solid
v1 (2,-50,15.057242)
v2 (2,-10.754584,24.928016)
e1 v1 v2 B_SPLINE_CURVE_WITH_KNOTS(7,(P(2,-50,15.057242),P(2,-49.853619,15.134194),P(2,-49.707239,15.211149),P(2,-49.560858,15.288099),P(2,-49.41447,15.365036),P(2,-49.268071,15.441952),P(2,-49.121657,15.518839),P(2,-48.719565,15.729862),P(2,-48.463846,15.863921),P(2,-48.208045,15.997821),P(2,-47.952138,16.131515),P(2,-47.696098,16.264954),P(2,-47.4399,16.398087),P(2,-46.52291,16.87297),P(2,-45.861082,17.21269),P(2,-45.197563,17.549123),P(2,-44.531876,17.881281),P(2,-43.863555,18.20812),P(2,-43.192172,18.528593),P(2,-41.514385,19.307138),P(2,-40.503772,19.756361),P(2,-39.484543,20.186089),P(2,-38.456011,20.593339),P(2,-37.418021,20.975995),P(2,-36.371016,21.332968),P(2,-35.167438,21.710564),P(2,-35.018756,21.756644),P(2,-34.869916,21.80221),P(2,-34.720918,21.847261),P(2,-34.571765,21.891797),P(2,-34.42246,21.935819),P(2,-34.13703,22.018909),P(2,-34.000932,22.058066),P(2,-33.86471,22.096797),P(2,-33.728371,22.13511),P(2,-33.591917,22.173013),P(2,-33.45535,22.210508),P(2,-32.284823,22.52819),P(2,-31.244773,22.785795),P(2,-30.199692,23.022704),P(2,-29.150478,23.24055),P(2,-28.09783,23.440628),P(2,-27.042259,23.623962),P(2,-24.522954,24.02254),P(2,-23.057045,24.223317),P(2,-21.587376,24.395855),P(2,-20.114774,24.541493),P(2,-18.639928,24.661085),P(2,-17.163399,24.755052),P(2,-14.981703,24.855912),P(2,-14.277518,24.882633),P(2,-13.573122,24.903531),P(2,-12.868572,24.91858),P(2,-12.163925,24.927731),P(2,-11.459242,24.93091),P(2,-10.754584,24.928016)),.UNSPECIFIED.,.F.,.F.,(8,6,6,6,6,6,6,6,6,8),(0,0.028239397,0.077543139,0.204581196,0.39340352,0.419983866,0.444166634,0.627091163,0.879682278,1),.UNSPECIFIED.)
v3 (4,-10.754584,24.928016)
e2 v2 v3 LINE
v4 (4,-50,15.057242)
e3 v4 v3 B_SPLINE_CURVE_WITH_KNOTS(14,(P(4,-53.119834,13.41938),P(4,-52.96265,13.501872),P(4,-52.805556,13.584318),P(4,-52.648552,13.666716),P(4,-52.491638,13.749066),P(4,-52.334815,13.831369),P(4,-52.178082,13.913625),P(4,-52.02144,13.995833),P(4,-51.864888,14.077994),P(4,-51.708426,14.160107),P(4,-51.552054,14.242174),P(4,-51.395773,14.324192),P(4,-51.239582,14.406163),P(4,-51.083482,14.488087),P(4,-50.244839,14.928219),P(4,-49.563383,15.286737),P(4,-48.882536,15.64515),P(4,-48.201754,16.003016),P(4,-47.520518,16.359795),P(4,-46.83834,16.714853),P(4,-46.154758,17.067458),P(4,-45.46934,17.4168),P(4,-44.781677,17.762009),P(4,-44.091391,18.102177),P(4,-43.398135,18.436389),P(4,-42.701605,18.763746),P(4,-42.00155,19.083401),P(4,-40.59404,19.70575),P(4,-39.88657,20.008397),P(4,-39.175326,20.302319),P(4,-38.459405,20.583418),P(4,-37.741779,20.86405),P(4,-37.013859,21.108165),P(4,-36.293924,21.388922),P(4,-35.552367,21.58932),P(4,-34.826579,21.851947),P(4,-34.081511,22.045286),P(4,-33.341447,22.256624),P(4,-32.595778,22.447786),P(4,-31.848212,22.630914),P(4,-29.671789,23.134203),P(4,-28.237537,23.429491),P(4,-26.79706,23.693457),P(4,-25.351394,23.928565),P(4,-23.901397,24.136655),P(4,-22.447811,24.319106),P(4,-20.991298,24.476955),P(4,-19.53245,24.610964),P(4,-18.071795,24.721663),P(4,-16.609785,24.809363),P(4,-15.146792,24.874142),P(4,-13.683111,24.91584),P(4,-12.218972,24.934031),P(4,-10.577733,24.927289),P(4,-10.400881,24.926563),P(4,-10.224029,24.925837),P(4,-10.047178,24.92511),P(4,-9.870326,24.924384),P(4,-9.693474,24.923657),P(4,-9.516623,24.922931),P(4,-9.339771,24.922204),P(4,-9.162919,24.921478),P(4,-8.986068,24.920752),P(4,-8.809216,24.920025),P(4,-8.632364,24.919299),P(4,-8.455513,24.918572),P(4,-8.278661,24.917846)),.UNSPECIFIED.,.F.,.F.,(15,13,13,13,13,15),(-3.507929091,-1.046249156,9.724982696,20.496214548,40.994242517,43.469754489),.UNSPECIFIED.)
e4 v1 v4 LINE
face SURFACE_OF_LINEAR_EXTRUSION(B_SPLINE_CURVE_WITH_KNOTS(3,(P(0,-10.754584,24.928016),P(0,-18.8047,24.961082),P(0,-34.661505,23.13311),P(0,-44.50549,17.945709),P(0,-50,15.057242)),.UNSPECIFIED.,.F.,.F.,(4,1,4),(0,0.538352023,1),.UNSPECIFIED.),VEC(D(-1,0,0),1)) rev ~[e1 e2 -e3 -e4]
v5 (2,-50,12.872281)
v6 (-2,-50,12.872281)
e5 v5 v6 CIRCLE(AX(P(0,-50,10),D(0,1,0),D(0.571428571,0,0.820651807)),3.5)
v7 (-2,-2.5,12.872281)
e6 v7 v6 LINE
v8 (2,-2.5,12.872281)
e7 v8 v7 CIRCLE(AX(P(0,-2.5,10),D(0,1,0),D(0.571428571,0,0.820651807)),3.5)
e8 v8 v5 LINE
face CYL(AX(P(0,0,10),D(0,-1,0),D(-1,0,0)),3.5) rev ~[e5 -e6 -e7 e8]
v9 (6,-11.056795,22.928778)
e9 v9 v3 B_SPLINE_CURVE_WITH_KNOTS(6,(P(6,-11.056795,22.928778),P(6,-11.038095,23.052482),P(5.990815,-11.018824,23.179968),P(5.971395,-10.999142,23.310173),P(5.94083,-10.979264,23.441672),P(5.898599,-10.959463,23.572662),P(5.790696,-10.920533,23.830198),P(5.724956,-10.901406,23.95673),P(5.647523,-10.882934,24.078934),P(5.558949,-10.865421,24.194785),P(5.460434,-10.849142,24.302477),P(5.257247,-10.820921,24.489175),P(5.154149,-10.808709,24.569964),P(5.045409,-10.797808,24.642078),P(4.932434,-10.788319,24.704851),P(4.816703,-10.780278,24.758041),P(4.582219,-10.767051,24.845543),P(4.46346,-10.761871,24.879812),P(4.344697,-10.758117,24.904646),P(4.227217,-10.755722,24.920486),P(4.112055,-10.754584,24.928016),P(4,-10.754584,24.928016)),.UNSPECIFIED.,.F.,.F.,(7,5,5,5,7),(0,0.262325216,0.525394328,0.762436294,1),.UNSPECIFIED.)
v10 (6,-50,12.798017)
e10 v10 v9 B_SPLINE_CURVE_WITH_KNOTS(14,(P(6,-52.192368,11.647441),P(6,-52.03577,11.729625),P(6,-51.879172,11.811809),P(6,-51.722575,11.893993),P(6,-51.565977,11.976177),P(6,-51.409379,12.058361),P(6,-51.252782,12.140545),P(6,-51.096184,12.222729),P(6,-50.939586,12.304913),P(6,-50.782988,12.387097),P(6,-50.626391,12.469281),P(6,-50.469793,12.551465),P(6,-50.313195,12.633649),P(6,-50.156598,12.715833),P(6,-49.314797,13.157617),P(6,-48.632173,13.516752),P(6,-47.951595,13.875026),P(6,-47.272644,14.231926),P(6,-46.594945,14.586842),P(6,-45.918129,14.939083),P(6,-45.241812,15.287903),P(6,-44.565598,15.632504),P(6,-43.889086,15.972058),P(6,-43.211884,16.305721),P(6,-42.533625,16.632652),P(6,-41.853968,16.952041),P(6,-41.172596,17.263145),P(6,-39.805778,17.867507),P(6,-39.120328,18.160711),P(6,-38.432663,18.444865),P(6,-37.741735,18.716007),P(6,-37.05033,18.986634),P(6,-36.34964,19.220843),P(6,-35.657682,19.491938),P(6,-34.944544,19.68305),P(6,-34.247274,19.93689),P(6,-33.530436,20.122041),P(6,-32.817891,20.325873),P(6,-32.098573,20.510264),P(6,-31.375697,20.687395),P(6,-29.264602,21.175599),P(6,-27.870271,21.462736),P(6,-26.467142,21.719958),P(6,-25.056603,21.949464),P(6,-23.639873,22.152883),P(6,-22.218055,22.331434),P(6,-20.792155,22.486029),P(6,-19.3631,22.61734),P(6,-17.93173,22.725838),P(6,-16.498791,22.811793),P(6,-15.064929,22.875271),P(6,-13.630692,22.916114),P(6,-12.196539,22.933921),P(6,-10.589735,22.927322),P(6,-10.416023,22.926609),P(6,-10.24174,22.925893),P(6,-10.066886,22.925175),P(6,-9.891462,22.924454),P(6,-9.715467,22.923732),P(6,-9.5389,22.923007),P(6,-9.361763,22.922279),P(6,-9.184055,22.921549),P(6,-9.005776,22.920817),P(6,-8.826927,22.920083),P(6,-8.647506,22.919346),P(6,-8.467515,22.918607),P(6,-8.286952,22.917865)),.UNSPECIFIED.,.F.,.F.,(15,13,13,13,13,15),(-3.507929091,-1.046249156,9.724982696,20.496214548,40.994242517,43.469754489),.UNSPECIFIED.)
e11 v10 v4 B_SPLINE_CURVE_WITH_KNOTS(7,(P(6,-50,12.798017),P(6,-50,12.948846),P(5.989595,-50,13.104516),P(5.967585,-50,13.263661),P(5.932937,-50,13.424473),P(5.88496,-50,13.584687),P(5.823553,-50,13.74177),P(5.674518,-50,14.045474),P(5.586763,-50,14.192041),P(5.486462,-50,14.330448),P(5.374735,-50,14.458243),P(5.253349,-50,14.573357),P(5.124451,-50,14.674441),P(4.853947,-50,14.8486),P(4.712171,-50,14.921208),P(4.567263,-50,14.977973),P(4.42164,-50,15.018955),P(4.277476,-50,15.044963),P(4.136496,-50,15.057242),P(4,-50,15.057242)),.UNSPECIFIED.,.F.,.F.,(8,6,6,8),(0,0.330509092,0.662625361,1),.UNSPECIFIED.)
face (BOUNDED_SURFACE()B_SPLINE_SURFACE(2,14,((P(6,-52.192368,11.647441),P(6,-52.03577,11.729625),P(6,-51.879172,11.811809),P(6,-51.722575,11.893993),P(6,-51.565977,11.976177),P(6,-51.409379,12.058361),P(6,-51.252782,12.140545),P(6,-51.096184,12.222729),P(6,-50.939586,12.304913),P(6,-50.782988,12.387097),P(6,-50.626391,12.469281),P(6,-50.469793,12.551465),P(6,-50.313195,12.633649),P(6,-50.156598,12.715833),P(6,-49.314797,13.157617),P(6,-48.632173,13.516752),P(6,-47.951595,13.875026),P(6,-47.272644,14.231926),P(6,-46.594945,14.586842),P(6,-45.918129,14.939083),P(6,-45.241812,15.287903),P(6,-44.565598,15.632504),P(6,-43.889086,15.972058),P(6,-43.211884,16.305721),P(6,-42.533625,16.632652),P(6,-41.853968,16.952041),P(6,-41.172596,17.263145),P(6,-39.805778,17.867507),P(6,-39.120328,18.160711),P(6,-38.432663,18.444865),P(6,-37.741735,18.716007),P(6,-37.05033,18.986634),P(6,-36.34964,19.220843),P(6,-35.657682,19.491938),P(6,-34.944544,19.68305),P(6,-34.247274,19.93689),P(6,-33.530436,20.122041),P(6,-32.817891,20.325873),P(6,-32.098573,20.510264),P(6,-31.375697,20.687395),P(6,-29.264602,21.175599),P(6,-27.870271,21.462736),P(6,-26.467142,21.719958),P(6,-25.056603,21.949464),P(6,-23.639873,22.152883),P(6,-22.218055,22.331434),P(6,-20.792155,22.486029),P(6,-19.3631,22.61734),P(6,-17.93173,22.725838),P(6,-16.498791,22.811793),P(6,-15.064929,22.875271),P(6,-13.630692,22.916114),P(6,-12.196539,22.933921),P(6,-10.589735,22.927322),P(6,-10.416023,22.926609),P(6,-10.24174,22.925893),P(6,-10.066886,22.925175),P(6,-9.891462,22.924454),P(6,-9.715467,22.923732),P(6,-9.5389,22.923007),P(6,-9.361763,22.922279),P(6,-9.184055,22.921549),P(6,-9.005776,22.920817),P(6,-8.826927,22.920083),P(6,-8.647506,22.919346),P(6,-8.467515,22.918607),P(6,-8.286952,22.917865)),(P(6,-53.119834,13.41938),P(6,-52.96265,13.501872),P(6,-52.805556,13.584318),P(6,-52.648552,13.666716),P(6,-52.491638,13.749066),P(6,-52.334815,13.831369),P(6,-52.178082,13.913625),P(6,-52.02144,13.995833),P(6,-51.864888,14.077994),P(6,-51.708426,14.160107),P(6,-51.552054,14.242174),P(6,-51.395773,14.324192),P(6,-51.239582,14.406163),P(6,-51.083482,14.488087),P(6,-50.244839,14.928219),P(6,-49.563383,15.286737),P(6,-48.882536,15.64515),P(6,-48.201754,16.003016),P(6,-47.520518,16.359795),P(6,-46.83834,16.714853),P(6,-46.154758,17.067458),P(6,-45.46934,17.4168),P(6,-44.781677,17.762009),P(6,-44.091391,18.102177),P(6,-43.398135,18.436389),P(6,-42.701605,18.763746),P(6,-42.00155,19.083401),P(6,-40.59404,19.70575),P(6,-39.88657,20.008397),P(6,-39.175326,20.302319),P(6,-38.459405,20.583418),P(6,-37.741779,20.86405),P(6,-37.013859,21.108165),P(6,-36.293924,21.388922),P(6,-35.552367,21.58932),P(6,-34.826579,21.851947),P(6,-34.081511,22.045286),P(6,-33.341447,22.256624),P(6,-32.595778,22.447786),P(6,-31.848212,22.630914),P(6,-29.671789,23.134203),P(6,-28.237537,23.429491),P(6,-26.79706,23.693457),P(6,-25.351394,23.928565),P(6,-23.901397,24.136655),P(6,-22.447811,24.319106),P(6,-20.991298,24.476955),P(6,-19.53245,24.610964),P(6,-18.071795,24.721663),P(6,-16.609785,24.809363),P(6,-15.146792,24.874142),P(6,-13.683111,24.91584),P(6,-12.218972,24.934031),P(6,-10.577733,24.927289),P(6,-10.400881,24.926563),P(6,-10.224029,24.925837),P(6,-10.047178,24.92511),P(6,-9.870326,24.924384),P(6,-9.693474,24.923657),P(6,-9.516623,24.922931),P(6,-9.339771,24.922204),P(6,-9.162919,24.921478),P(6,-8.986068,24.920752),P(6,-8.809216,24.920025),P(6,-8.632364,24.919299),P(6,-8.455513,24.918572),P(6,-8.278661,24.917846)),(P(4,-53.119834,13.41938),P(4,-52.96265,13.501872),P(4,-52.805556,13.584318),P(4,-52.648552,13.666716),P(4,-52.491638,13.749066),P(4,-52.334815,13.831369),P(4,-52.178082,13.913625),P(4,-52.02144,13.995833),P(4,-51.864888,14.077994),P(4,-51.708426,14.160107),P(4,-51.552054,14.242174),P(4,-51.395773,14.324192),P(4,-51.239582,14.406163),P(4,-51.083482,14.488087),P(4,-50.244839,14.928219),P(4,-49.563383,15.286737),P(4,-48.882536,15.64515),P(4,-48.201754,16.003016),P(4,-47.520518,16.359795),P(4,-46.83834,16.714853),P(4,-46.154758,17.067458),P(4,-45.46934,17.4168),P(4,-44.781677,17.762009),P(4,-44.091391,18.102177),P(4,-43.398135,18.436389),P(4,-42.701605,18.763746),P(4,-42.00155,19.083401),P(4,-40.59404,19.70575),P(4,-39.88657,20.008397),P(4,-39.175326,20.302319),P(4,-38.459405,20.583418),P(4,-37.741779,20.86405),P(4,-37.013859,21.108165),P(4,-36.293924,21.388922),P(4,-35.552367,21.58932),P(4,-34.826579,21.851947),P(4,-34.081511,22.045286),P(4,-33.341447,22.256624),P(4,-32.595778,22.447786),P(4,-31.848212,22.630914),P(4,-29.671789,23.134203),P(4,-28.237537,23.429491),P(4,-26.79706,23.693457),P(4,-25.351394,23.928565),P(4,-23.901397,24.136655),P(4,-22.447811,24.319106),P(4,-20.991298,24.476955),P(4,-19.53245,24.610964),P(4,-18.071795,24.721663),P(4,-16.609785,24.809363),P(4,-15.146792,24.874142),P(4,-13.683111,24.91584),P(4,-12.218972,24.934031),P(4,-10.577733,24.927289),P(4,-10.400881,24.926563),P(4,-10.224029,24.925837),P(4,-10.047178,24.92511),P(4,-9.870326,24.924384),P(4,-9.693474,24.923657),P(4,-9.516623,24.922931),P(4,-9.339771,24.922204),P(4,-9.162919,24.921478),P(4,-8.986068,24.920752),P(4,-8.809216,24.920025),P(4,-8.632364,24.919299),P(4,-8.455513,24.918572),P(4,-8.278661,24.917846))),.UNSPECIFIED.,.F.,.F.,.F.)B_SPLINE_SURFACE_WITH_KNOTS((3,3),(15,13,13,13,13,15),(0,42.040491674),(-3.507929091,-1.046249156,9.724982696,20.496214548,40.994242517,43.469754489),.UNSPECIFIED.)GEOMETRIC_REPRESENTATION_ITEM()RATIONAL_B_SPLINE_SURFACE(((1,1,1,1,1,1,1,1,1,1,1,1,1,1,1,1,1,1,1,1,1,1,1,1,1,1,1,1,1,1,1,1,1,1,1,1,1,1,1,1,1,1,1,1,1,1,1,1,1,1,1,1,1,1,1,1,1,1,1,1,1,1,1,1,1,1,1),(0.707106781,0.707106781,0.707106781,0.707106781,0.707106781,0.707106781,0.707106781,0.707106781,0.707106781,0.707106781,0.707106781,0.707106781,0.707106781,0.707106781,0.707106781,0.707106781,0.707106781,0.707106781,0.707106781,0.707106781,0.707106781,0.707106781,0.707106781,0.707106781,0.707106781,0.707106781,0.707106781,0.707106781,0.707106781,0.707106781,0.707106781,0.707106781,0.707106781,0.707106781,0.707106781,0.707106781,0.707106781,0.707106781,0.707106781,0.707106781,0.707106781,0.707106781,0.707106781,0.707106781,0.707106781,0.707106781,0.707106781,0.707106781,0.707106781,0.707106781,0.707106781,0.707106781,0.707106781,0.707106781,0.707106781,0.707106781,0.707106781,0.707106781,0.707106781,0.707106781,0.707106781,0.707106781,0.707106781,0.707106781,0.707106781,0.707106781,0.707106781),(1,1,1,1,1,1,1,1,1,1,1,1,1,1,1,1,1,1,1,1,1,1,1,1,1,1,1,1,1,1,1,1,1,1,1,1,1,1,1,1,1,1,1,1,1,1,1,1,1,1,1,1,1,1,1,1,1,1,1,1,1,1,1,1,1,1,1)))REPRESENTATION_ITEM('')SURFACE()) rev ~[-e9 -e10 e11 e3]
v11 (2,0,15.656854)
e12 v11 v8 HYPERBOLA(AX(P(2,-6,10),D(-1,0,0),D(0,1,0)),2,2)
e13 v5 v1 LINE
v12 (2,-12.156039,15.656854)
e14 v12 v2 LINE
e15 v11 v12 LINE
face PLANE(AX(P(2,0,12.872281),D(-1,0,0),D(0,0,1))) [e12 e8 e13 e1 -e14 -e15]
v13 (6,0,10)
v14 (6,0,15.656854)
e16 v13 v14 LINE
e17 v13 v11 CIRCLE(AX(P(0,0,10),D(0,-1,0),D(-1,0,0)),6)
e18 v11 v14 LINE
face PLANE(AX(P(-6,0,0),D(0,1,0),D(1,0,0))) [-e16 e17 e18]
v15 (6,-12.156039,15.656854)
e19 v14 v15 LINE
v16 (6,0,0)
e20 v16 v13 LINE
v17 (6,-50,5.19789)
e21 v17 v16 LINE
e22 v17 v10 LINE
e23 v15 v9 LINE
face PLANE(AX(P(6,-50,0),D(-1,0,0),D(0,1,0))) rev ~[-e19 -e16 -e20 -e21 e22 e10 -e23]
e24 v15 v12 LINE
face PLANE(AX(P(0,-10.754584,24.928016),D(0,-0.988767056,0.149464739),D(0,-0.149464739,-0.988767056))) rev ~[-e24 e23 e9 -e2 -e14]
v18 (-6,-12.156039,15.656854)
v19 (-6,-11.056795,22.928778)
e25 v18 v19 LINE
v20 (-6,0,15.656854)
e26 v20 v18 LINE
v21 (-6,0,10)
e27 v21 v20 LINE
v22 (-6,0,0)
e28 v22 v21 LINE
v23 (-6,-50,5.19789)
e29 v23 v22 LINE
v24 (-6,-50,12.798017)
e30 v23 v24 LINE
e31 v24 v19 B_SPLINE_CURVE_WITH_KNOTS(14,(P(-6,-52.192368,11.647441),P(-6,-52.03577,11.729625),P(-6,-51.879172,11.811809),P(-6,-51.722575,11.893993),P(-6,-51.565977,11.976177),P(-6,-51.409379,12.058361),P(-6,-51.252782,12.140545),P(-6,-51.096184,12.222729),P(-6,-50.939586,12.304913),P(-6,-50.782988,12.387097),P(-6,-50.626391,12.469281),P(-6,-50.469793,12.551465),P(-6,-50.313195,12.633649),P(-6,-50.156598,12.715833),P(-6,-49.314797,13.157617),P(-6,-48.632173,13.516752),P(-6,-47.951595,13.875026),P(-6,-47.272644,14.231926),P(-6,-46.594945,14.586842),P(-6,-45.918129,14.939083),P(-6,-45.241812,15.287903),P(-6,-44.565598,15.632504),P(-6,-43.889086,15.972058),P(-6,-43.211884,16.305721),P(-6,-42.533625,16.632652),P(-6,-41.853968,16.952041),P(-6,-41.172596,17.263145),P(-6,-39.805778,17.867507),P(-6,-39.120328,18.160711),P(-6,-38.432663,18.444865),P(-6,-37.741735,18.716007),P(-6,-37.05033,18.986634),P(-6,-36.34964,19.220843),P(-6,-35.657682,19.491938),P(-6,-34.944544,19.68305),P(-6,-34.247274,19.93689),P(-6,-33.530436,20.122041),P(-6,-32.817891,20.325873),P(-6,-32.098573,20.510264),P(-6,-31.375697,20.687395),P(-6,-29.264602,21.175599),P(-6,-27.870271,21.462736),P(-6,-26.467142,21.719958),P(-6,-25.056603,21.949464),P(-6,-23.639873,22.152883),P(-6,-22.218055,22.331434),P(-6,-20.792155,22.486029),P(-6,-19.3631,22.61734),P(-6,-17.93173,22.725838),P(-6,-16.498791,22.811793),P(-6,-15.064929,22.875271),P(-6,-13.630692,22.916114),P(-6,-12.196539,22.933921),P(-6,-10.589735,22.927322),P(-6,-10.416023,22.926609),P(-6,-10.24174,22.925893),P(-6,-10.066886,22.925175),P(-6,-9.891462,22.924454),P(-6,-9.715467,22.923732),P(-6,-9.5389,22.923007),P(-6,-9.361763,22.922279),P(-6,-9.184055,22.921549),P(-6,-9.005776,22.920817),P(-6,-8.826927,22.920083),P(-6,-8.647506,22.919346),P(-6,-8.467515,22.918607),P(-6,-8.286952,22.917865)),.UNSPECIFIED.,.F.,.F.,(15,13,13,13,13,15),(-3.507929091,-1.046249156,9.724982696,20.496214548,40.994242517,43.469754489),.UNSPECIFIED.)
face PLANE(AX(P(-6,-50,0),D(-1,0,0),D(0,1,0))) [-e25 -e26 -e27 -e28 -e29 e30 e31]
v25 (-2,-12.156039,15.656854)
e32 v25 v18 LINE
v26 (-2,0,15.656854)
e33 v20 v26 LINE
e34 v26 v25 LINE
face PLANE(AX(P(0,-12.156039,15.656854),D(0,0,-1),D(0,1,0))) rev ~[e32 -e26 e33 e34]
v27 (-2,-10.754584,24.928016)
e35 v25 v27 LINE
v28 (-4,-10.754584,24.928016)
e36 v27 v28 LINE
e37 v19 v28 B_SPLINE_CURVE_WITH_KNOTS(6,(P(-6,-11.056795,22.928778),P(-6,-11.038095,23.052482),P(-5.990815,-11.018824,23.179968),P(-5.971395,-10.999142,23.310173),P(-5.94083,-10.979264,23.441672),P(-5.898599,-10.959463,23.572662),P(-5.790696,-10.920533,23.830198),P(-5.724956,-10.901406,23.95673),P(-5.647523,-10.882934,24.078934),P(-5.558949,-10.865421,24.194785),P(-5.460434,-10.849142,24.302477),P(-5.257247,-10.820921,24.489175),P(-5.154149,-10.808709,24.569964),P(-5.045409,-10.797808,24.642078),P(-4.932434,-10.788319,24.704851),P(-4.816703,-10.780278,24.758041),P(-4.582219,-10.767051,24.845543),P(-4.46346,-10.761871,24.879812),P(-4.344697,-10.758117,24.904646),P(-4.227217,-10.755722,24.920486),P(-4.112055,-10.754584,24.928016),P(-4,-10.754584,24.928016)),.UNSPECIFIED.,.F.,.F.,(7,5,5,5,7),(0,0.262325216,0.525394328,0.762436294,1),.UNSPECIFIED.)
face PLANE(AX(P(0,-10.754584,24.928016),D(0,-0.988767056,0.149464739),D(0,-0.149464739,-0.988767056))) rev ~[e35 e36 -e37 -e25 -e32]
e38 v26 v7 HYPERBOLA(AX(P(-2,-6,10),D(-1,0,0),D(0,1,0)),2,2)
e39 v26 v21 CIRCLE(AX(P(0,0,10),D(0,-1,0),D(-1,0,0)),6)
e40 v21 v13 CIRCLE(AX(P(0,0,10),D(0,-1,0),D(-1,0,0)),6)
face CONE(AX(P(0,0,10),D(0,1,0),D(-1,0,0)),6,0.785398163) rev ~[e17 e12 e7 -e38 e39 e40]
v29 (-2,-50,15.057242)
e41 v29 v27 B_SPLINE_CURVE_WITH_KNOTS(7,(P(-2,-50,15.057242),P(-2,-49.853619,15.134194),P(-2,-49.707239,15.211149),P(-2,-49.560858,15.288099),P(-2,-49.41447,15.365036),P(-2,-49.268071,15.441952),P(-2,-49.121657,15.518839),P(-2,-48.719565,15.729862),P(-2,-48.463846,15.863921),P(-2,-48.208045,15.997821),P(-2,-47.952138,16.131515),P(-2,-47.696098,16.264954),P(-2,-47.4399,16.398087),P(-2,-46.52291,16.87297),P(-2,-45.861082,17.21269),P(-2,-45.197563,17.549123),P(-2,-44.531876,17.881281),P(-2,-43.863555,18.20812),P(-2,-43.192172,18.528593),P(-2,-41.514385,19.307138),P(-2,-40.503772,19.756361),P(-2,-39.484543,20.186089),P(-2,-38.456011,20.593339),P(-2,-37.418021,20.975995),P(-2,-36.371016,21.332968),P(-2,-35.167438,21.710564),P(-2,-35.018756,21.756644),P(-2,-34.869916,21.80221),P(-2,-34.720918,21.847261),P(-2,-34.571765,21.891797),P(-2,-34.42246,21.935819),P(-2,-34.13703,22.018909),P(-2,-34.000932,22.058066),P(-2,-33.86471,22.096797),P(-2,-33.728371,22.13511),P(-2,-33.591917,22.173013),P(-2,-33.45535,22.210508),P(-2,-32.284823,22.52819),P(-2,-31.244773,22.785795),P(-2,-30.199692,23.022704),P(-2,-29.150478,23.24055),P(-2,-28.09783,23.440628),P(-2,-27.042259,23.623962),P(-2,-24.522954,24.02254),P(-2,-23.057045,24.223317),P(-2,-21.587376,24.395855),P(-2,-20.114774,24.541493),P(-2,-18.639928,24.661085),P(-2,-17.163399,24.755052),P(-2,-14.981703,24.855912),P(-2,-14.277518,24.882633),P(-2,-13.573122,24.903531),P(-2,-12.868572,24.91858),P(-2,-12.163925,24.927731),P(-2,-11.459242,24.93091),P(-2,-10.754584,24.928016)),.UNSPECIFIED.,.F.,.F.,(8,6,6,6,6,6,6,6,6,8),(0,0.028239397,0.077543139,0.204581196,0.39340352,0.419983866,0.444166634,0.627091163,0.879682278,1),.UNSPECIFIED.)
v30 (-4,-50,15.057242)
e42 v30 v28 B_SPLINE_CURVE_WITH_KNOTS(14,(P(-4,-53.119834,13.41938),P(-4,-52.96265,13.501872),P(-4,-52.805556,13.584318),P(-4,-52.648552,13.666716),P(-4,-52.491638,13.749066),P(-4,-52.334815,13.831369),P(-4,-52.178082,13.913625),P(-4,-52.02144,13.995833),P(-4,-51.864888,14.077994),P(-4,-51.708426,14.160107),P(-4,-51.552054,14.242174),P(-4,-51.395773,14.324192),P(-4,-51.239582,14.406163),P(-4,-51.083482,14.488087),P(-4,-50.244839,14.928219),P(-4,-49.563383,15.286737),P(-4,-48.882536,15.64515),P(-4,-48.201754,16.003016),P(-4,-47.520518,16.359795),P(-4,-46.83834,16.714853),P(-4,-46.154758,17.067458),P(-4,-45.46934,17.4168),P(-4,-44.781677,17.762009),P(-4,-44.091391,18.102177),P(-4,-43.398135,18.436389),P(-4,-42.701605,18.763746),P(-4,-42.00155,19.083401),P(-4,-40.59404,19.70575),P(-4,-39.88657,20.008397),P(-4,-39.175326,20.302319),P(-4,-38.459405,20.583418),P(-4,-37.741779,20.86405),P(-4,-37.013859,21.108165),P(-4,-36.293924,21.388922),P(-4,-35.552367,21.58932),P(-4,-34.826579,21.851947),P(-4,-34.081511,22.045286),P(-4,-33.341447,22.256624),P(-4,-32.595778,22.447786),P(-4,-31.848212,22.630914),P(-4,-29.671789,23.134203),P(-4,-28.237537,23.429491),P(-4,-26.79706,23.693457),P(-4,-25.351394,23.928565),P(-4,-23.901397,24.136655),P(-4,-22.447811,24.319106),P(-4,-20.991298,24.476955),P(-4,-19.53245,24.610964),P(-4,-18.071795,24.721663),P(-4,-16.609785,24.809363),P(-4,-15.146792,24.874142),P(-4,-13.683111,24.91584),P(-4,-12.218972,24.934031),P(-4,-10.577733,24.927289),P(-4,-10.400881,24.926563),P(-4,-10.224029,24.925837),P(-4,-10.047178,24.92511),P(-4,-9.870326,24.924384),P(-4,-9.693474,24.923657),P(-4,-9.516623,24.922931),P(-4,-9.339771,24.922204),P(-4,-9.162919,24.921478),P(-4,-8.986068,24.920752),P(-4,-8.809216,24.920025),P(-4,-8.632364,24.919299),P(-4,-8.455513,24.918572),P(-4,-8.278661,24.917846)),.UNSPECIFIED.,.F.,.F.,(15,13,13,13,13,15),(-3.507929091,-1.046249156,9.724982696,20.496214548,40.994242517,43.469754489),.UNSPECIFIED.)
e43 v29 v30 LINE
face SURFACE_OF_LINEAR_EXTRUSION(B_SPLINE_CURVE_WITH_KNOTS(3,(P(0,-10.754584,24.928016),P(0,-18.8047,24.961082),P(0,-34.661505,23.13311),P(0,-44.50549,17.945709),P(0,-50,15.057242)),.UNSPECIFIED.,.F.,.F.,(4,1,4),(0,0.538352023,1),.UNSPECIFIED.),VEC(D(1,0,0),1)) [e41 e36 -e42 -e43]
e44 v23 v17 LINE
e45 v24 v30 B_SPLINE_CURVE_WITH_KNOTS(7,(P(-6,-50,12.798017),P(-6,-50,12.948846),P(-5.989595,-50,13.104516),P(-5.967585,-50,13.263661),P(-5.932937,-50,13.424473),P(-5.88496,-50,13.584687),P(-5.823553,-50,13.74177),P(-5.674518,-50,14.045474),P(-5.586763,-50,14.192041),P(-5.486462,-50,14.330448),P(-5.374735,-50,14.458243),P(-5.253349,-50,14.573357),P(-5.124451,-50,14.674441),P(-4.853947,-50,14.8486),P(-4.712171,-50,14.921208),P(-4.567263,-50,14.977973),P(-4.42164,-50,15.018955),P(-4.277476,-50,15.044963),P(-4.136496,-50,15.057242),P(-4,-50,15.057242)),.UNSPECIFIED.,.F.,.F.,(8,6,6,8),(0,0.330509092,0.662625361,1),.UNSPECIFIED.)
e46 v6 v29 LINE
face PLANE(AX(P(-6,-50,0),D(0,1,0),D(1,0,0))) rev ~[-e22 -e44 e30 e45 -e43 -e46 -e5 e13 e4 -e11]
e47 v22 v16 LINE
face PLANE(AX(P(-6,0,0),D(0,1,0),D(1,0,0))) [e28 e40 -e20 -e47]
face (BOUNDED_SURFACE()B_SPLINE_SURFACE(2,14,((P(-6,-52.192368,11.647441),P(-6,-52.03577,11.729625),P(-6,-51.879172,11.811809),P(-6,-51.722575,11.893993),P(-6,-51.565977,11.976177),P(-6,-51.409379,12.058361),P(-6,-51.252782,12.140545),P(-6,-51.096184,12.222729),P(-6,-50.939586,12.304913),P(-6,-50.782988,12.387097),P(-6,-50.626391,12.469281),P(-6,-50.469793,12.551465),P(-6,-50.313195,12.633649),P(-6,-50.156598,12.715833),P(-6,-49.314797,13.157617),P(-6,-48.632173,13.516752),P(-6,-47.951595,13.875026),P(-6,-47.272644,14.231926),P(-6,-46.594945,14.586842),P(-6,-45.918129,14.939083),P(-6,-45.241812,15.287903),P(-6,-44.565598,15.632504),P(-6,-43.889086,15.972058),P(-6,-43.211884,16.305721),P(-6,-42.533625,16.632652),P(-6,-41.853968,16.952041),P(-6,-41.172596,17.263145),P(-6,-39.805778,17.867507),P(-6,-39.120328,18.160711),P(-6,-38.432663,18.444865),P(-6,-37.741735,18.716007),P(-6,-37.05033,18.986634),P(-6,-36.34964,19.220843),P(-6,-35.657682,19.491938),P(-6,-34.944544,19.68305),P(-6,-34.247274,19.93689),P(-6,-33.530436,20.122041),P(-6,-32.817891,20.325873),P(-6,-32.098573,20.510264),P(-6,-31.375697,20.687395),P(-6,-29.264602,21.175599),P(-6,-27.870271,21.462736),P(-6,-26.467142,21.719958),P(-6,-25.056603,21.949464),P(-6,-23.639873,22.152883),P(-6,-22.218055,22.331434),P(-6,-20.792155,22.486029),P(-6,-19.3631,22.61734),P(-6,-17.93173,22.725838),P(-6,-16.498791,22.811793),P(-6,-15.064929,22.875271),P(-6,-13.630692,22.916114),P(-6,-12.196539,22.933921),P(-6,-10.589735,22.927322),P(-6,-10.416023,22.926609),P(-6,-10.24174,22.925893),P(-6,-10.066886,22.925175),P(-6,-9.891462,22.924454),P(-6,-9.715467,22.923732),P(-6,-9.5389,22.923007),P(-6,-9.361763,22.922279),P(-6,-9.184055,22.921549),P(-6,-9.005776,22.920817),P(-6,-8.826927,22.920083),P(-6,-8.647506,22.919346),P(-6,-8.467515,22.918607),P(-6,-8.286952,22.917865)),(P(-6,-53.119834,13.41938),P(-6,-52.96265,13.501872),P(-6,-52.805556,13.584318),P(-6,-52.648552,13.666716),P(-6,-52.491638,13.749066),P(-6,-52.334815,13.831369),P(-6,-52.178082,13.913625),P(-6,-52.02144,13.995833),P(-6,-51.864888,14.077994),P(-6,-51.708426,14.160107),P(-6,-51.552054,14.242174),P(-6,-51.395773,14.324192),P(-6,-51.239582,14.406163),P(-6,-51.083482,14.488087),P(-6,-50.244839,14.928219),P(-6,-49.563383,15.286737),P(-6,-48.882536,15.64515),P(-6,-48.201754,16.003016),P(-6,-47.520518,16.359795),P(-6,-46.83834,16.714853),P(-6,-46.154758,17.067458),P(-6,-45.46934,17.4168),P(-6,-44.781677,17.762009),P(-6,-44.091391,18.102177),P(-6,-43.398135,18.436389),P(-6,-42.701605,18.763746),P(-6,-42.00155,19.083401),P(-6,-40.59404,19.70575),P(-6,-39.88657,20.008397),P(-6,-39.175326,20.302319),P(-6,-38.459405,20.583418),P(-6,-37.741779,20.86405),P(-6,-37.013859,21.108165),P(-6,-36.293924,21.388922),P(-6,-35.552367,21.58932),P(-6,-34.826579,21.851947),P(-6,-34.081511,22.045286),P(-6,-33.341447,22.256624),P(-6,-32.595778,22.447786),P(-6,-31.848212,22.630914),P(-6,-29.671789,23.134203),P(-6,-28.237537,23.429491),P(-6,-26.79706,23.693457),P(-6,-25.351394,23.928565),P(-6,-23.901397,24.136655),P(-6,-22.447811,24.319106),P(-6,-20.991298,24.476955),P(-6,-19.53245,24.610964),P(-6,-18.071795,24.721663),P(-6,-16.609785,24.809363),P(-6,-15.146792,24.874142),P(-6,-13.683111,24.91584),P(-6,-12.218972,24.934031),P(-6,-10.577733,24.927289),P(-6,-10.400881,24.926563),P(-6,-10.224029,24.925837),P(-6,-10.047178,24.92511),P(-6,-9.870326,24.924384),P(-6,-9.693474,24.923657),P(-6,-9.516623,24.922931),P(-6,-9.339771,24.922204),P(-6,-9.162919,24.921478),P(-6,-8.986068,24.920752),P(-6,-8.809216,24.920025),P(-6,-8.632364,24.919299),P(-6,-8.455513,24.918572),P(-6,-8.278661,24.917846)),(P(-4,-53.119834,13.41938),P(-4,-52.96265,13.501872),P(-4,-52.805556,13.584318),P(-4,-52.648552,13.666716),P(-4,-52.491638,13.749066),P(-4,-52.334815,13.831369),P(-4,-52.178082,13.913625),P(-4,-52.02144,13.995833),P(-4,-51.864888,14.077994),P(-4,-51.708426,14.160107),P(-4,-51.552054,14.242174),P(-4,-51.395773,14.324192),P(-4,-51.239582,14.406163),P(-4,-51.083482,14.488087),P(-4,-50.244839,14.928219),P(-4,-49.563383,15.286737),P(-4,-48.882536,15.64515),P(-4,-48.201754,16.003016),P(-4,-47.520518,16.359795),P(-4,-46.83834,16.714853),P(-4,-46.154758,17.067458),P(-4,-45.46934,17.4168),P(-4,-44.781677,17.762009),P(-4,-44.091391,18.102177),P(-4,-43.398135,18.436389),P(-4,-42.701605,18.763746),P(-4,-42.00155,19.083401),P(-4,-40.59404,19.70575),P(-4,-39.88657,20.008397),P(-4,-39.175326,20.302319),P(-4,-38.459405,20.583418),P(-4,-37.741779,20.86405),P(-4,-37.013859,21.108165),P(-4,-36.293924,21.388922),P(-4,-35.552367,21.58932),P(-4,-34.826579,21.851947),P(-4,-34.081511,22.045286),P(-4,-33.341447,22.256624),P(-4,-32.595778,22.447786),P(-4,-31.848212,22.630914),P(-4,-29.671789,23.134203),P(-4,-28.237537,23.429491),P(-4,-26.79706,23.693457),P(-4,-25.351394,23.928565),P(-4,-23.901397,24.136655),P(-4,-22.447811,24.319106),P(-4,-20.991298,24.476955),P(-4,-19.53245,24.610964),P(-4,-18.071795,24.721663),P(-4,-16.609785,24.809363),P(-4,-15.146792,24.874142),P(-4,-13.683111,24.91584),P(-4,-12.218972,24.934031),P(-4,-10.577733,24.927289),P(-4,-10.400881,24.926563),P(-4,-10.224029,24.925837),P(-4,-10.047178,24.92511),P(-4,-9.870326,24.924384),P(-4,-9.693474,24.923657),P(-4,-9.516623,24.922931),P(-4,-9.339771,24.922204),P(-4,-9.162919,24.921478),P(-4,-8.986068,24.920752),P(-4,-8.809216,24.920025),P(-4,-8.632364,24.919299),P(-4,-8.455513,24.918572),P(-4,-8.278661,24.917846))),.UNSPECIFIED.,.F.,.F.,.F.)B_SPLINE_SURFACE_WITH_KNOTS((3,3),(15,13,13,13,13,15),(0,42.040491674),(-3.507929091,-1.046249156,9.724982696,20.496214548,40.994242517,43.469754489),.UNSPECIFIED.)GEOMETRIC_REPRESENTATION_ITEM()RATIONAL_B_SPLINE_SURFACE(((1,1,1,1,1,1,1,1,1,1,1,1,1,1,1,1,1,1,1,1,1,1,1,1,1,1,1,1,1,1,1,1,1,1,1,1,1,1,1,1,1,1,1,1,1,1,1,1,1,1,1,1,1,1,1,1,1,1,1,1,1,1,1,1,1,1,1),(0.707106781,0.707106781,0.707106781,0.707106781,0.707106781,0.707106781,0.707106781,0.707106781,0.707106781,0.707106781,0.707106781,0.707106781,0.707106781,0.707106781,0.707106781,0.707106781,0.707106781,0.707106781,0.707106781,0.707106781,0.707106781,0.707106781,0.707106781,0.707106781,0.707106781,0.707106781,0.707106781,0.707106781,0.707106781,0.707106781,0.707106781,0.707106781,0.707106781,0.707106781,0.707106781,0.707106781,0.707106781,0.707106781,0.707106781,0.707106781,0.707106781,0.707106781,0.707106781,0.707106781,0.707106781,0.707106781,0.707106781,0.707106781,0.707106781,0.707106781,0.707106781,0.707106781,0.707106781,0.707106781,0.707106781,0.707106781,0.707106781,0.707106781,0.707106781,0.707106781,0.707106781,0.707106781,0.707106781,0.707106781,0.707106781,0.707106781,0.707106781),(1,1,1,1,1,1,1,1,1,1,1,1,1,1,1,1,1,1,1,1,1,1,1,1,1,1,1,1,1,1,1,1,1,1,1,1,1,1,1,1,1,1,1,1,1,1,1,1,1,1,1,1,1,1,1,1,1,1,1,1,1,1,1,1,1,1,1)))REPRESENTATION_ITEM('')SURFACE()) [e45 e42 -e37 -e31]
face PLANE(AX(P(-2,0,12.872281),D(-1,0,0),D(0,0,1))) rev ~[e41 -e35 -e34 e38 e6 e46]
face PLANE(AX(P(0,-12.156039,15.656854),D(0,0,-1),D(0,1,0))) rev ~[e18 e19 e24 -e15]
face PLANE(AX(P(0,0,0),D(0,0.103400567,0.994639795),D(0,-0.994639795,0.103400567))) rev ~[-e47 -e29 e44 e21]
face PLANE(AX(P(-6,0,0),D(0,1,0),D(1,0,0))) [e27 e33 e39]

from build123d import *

# Parameters (mm, degrees)
F0_W           = 12
F0_H           = 50
F1_DEPTH       = 30
F3_D           = 7
F3_CSINK_D     = 12
F3_CSINK_ANGLE = 90
F4_W           = 4
F4_H           = 17.1277186767
F5_DEPTH       = 50
F11_DEPTH      = 12.5
F12_R          = 2
F15_DEPTH      = 12.5


# Not quite as in the source:
# - two fillets or chamfers of one size are made in one step
# - the dataset's text gives a spline's control points without its knots; the knots are read off the source's solid


with BuildPart() as f1:
    # F0 (on Top) → F1 (new body)
    with BuildSketch(Plane.XY):
        with Locations((0, -25)):
            Rectangle(F0_W, F0_H)
    extrude(amount=F1_DEPTH)

    # F3 (through all)
    with Locations(Plane(origin=(0, 0, 0), x_dir=(1, 0, 0), z_dir=(0, 1, 0))):
        with Locations((0, -10)):
            CounterSinkHole(F3_D / 2, F3_CSINK_D / 2, counter_sink_angle=F3_CSINK_ANGLE)

    # F4 (on Front) → F5 (cut)
    with BuildSketch(Plane.XZ):
        with Locations((0, 21.4361406616)):
            Rectangle(F4_W, F4_H)
    extrude(amount=F5_DEPTH, mode=Mode.SUBTRACT)

    # F10 (on Right) → F11 (cut, symmetric)
    with BuildSketch(Plane.YZ):
        with BuildLine():
            Line((-12.1560385451, 15.6568542495), (0, 15.6568542495))
            Line((0, 15.6568542495), (0, 30))
            Line((0, 30), (-50, 30))
            Line((-50, 30), (-50, 15.0572415441))
            add(Edge.make_bspline(
                [(-10.7545843348, 24.9280158802), (-18.8047000422, 24.9610823092), (-34.6615045914, 23.1331099195), (-44.5054902356, 17.945709156), (-50, 15.0572415441)],
                knots=[0, 0, 0, 0, 0.5383520225, 1, 1, 1, 1], degree=3))
            Line((-10.7545843348, 24.9280158802), (-12.1560385451, 15.6568542495))
        make_face()
    extrude(amount=F11_DEPTH, both=True, mode=Mode.SUBTRACT)

    # F12
    f12_edges = [f1.edges().sort_by_distance(p)[0] for p in [
        (-6, -31.098721, 22.804231),
        (6, -31.098721, 22.804231),
    ]]
    fillet(f12_edges, radius=F12_R)

    # F14 (on Right) → F15 (cut, symmetric)
    with BuildSketch(Plane.YZ):
        Polygon((0, 0), (-50, 5.1978901029), (-50, 0), align=None)
    extrude(amount=F15_DEPTH, both=True, mode=Mode.SUBTRACT)


solid = f1.part
